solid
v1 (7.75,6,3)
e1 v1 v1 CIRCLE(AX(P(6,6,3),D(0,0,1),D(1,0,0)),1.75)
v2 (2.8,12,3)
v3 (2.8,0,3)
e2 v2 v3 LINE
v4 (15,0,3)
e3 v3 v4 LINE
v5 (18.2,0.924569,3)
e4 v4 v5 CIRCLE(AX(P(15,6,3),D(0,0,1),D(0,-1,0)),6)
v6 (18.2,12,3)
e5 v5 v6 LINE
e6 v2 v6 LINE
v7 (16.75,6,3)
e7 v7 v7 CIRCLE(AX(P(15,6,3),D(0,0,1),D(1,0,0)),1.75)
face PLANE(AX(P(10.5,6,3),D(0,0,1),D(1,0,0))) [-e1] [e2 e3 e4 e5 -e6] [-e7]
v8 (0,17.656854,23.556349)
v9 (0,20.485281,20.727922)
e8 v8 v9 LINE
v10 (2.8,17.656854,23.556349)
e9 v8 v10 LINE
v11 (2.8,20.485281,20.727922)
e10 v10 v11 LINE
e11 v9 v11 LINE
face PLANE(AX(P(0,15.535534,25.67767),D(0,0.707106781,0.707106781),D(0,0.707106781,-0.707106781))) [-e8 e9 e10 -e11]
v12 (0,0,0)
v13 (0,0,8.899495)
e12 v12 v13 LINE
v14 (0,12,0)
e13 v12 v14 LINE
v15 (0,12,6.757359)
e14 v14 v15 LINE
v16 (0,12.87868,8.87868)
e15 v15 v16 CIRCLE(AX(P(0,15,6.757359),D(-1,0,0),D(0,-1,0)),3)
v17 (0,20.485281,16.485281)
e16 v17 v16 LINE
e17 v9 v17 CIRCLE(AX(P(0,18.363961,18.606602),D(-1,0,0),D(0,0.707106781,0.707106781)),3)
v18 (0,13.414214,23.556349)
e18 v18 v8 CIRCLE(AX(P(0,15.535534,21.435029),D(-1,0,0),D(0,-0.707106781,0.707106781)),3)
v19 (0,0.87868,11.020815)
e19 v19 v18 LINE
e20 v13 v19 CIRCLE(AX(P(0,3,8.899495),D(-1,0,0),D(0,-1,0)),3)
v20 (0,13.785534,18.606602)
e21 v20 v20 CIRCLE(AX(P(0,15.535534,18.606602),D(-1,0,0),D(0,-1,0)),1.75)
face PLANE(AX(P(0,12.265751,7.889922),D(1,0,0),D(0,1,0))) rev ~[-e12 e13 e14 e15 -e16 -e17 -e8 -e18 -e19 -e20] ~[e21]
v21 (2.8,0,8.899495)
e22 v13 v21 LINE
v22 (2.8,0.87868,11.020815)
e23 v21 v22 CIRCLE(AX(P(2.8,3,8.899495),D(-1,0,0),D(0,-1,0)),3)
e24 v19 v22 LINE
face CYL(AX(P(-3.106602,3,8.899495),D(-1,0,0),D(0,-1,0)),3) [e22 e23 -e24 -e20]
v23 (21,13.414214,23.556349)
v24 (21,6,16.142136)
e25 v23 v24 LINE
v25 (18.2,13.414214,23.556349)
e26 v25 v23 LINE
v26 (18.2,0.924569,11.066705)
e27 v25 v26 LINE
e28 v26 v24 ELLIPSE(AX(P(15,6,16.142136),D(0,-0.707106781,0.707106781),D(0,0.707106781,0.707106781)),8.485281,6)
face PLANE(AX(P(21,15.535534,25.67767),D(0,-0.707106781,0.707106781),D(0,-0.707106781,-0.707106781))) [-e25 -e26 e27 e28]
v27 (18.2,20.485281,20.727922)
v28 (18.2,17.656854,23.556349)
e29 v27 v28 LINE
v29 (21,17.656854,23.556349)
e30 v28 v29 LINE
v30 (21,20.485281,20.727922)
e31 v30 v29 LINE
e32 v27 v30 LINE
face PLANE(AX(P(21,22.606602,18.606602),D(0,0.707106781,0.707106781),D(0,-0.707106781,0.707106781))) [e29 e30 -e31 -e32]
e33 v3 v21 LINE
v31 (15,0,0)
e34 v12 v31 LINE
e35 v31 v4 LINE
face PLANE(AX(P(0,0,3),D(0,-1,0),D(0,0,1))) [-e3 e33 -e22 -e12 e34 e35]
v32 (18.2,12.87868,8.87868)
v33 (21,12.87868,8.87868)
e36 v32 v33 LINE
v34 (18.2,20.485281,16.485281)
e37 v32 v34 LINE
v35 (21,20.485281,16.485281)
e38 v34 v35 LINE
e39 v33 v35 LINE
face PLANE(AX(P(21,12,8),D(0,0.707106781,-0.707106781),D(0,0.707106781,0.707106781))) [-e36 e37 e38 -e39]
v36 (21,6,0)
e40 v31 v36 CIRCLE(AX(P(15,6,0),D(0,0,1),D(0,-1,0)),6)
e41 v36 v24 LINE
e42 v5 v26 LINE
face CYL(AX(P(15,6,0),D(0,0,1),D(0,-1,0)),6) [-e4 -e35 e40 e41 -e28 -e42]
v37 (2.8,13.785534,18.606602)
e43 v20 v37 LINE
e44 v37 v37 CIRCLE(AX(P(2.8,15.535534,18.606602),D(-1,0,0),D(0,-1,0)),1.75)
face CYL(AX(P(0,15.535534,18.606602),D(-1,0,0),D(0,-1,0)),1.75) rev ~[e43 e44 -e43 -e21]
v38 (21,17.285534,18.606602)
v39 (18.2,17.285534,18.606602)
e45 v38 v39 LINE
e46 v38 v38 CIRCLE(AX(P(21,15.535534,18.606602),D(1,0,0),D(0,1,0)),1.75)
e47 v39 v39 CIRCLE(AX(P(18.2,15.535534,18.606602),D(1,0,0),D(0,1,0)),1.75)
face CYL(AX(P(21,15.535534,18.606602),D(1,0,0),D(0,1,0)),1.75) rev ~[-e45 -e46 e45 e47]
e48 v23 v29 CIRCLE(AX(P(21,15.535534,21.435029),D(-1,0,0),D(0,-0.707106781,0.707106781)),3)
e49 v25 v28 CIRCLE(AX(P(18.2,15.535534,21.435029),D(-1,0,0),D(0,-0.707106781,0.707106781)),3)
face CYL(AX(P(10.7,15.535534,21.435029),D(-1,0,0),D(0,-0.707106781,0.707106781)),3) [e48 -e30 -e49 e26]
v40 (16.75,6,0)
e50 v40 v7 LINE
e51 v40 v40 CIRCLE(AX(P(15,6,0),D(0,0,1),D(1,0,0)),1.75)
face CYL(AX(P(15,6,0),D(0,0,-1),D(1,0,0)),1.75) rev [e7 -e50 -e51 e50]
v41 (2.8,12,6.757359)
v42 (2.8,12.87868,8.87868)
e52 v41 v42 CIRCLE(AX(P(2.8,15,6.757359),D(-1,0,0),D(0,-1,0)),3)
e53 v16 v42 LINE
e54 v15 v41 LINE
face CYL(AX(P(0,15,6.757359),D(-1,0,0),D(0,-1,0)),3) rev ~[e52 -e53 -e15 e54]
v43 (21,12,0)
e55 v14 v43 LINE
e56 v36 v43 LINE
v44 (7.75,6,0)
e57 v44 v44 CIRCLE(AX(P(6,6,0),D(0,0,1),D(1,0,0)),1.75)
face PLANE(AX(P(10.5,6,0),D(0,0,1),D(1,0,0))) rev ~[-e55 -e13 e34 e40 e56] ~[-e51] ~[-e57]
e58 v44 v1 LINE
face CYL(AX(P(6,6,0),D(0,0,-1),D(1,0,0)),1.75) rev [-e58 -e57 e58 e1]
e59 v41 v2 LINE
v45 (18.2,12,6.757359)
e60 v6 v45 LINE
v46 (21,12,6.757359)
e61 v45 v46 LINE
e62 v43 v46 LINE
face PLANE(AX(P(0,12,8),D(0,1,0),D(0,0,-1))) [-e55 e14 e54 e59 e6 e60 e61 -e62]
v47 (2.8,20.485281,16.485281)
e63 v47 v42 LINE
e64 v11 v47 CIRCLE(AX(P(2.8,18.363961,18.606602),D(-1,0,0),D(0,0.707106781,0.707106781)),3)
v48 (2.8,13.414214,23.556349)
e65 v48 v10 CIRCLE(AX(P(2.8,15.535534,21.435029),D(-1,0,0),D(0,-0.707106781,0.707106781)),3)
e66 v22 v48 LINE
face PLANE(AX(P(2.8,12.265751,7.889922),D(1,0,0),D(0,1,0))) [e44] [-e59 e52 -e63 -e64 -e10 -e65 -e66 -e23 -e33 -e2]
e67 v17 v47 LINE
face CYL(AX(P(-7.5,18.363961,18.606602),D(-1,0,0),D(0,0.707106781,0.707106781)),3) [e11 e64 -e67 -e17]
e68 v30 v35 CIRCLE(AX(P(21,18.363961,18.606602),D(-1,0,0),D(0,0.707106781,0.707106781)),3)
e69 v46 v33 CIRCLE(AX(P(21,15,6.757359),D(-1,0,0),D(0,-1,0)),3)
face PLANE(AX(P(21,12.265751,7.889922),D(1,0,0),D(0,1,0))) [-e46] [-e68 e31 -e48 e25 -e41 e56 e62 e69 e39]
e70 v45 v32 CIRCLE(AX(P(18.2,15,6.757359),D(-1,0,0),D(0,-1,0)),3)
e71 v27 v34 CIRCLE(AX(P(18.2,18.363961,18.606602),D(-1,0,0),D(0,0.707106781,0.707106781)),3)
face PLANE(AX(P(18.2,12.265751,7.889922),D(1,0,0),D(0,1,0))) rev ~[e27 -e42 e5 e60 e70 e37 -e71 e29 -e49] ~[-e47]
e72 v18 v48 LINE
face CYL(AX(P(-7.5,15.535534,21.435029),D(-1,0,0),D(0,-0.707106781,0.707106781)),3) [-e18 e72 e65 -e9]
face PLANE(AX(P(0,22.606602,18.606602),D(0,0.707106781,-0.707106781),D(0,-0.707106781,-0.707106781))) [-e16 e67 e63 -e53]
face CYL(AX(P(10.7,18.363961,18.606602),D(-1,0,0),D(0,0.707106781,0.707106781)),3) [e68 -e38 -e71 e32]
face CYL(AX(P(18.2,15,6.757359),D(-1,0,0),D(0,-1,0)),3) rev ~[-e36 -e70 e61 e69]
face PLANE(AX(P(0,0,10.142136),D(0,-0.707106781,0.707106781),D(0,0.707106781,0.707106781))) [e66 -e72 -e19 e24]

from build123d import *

# Parameters (mm, degrees)
F0_W        = 21
F0_H        = 12
F0_R        = 1.75
F1_DEPTH    = 3
F3_R        = 1.75
F4_DEPTH    = 2.8
F2_R        = 1.75
F5_DEPTH    = 2.8
F6_R        = 6
F7_T1_DEPTH = 2.8
F7_T3_DEPTH = 2.8
F7_T5_DEPTH = 17.8
F7_T7_DEPTH = 17.8
F7_T9_DEPTH = 9.0132034356


# Not quite as in the source:
# - a fillet or chamfer that OpenCascade refuses, or shapes differently, is made with other operations: its cross-section is extruded or revolved along the edge and cut away or added


with BuildPart() as f1:
    # F0 (on Top) → F1 (new body)
    with BuildSketch(Plane.XY):
        with Locations((10.5, 6)):
            Rectangle(F0_W, F0_H)
        with Locations((6, 6)):
            Circle(F0_R, mode=Mode.SUBTRACT)
        with Locations((15, 6)):
            Circle(F0_R, mode=Mode.SUBTRACT)
    extrude(amount=F1_DEPTH)

    # F3 (on face) → F4 (join)
    with BuildSketch(Plane.YZ.offset(21)):
        Polygon((0, 10.1421356237), (0, 3), (12, 3), (12, 8), (22.6066017178, 18.6066017178), (15.5355339059, 25.6776695297), align=None)
        with Locations((15.5355339059, 18.6066017178)):
            Circle(F3_R, mode=Mode.SUBTRACT)
    extrude(amount=-F4_DEPTH)

    # F2 (on face) → F5 (join)
    with BuildSketch(Plane(origin=(0, 0, 0), x_dir=(0, -1, 0), z_dir=(-1, 0, 0))):
        Polygon((-12, 8), (-12, 3), (0, 3), (0, 10.1421356237), (-15.5355339059, 25.6776695297), (-22.6066017178, 18.6066017178), align=None)
        with Locations((-15.5355339059, 18.6066017178)):
            Circle(F2_R, mode=Mode.SUBTRACT)
    extrude(amount=-F5_DEPTH)

    # F6
    f6_edges = [f1.edges().sort_by_distance(p)[0] for p in [
        (21, 0, 5.071068),
    ]]
    fillet(f6_edges, radius=F6_R)

    # F7: fillet of radius 3 on 8 edges, made by hand

    # F7_s2 → F7_t1 (join)
    with BuildSketch(Plane.YZ.offset(18.2)):
        with BuildLine():
            ThreePointArc((12, 6.7573593129), (12.2283614025, 7.90540961), (12.8786796564, 8.8786796564))
            Line((12.8786796564, 8.8786796564), (12, 8))
            Line((12, 8), (12, 6.7573593129))
        make_face()
    extrude(amount=F7_T1_DEPTH)

    # F7_s4 → F7_t3 (join)
    with BuildSketch(Plane.YZ):
        with BuildLine():
            ThreePointArc((12, 6.7573593129), (12.2283614025, 7.90540961), (12.8786796564, 8.8786796564))
            Line((12.8786796564, 8.8786796564), (12, 8))
            Line((12, 8), (12, 6.7573593129))
        make_face()
    extrude(amount=F7_T3_DEPTH)

    # F7_s6 → F7_t5 (cut)
    with BuildSketch(Plane.YZ.offset(-7.5)):
        with BuildLine():
            ThreePointArc((20.4852813742, 20.7279220614), (21.3639610307, 18.6066017178), (20.4852813742, 16.4852813742))
            Line((20.4852813742, 16.4852813742), (22.6066017178, 18.6066017178))
            Line((22.6066017178, 18.6066017178), (20.4852813742, 20.7279220614))
        make_face()
        with BuildLine():
            ThreePointArc((13.4142135624, 23.5563491861), (15.5355339059, 24.4350288425), (17.6568542495, 23.5563491861))
            Line((17.6568542495, 23.5563491861), (15.5355339059, 25.6776695297))
            Line((15.5355339059, 25.6776695297), (13.4142135624, 23.5563491861))
        make_face()
    extrude(amount=F7_T5_DEPTH, mode=Mode.SUBTRACT)

    # F7_s8 → F7_t7 (cut)
    with BuildSketch(Plane.YZ.offset(10.7)):
        with BuildLine():
            ThreePointArc((20.4852813742, 20.7279220614), (21.3639610307, 18.6066017178), (20.4852813742, 16.4852813742))
            Line((20.4852813742, 16.4852813742), (22.6066017178, 18.6066017178))
            Line((22.6066017178, 18.6066017178), (20.4852813742, 20.7279220614))
        make_face()
        with BuildLine():
            ThreePointArc((13.4142135624, 23.5563491861), (15.5355339059, 24.4350288425), (17.6568542495, 23.5563491861))
            Line((17.6568542495, 23.5563491861), (15.5355339059, 25.6776695297))
            Line((15.5355339059, 25.6776695297), (13.4142135624, 23.5563491861))
        make_face()
    extrude(amount=F7_T7_DEPTH, mode=Mode.SUBTRACT)

    # F7_s10 → F7_t9 (cut)
    with BuildSketch(Plane.YZ.offset(-3.1066017178)):
        with BuildLine():
            ThreePointArc((0, 8.8994949366), (0.2283614025, 10.0475452337), (0.8786796564, 11.0208152802))
            Line((0.8786796564, 11.0208152802), (0, 10.1421356237))
            Line((0, 10.1421356237), (0, 8.8994949366))
        make_face()
    extrude(amount=F7_T9_DEPTH, mode=Mode.SUBTRACT)


solid = f1.part
